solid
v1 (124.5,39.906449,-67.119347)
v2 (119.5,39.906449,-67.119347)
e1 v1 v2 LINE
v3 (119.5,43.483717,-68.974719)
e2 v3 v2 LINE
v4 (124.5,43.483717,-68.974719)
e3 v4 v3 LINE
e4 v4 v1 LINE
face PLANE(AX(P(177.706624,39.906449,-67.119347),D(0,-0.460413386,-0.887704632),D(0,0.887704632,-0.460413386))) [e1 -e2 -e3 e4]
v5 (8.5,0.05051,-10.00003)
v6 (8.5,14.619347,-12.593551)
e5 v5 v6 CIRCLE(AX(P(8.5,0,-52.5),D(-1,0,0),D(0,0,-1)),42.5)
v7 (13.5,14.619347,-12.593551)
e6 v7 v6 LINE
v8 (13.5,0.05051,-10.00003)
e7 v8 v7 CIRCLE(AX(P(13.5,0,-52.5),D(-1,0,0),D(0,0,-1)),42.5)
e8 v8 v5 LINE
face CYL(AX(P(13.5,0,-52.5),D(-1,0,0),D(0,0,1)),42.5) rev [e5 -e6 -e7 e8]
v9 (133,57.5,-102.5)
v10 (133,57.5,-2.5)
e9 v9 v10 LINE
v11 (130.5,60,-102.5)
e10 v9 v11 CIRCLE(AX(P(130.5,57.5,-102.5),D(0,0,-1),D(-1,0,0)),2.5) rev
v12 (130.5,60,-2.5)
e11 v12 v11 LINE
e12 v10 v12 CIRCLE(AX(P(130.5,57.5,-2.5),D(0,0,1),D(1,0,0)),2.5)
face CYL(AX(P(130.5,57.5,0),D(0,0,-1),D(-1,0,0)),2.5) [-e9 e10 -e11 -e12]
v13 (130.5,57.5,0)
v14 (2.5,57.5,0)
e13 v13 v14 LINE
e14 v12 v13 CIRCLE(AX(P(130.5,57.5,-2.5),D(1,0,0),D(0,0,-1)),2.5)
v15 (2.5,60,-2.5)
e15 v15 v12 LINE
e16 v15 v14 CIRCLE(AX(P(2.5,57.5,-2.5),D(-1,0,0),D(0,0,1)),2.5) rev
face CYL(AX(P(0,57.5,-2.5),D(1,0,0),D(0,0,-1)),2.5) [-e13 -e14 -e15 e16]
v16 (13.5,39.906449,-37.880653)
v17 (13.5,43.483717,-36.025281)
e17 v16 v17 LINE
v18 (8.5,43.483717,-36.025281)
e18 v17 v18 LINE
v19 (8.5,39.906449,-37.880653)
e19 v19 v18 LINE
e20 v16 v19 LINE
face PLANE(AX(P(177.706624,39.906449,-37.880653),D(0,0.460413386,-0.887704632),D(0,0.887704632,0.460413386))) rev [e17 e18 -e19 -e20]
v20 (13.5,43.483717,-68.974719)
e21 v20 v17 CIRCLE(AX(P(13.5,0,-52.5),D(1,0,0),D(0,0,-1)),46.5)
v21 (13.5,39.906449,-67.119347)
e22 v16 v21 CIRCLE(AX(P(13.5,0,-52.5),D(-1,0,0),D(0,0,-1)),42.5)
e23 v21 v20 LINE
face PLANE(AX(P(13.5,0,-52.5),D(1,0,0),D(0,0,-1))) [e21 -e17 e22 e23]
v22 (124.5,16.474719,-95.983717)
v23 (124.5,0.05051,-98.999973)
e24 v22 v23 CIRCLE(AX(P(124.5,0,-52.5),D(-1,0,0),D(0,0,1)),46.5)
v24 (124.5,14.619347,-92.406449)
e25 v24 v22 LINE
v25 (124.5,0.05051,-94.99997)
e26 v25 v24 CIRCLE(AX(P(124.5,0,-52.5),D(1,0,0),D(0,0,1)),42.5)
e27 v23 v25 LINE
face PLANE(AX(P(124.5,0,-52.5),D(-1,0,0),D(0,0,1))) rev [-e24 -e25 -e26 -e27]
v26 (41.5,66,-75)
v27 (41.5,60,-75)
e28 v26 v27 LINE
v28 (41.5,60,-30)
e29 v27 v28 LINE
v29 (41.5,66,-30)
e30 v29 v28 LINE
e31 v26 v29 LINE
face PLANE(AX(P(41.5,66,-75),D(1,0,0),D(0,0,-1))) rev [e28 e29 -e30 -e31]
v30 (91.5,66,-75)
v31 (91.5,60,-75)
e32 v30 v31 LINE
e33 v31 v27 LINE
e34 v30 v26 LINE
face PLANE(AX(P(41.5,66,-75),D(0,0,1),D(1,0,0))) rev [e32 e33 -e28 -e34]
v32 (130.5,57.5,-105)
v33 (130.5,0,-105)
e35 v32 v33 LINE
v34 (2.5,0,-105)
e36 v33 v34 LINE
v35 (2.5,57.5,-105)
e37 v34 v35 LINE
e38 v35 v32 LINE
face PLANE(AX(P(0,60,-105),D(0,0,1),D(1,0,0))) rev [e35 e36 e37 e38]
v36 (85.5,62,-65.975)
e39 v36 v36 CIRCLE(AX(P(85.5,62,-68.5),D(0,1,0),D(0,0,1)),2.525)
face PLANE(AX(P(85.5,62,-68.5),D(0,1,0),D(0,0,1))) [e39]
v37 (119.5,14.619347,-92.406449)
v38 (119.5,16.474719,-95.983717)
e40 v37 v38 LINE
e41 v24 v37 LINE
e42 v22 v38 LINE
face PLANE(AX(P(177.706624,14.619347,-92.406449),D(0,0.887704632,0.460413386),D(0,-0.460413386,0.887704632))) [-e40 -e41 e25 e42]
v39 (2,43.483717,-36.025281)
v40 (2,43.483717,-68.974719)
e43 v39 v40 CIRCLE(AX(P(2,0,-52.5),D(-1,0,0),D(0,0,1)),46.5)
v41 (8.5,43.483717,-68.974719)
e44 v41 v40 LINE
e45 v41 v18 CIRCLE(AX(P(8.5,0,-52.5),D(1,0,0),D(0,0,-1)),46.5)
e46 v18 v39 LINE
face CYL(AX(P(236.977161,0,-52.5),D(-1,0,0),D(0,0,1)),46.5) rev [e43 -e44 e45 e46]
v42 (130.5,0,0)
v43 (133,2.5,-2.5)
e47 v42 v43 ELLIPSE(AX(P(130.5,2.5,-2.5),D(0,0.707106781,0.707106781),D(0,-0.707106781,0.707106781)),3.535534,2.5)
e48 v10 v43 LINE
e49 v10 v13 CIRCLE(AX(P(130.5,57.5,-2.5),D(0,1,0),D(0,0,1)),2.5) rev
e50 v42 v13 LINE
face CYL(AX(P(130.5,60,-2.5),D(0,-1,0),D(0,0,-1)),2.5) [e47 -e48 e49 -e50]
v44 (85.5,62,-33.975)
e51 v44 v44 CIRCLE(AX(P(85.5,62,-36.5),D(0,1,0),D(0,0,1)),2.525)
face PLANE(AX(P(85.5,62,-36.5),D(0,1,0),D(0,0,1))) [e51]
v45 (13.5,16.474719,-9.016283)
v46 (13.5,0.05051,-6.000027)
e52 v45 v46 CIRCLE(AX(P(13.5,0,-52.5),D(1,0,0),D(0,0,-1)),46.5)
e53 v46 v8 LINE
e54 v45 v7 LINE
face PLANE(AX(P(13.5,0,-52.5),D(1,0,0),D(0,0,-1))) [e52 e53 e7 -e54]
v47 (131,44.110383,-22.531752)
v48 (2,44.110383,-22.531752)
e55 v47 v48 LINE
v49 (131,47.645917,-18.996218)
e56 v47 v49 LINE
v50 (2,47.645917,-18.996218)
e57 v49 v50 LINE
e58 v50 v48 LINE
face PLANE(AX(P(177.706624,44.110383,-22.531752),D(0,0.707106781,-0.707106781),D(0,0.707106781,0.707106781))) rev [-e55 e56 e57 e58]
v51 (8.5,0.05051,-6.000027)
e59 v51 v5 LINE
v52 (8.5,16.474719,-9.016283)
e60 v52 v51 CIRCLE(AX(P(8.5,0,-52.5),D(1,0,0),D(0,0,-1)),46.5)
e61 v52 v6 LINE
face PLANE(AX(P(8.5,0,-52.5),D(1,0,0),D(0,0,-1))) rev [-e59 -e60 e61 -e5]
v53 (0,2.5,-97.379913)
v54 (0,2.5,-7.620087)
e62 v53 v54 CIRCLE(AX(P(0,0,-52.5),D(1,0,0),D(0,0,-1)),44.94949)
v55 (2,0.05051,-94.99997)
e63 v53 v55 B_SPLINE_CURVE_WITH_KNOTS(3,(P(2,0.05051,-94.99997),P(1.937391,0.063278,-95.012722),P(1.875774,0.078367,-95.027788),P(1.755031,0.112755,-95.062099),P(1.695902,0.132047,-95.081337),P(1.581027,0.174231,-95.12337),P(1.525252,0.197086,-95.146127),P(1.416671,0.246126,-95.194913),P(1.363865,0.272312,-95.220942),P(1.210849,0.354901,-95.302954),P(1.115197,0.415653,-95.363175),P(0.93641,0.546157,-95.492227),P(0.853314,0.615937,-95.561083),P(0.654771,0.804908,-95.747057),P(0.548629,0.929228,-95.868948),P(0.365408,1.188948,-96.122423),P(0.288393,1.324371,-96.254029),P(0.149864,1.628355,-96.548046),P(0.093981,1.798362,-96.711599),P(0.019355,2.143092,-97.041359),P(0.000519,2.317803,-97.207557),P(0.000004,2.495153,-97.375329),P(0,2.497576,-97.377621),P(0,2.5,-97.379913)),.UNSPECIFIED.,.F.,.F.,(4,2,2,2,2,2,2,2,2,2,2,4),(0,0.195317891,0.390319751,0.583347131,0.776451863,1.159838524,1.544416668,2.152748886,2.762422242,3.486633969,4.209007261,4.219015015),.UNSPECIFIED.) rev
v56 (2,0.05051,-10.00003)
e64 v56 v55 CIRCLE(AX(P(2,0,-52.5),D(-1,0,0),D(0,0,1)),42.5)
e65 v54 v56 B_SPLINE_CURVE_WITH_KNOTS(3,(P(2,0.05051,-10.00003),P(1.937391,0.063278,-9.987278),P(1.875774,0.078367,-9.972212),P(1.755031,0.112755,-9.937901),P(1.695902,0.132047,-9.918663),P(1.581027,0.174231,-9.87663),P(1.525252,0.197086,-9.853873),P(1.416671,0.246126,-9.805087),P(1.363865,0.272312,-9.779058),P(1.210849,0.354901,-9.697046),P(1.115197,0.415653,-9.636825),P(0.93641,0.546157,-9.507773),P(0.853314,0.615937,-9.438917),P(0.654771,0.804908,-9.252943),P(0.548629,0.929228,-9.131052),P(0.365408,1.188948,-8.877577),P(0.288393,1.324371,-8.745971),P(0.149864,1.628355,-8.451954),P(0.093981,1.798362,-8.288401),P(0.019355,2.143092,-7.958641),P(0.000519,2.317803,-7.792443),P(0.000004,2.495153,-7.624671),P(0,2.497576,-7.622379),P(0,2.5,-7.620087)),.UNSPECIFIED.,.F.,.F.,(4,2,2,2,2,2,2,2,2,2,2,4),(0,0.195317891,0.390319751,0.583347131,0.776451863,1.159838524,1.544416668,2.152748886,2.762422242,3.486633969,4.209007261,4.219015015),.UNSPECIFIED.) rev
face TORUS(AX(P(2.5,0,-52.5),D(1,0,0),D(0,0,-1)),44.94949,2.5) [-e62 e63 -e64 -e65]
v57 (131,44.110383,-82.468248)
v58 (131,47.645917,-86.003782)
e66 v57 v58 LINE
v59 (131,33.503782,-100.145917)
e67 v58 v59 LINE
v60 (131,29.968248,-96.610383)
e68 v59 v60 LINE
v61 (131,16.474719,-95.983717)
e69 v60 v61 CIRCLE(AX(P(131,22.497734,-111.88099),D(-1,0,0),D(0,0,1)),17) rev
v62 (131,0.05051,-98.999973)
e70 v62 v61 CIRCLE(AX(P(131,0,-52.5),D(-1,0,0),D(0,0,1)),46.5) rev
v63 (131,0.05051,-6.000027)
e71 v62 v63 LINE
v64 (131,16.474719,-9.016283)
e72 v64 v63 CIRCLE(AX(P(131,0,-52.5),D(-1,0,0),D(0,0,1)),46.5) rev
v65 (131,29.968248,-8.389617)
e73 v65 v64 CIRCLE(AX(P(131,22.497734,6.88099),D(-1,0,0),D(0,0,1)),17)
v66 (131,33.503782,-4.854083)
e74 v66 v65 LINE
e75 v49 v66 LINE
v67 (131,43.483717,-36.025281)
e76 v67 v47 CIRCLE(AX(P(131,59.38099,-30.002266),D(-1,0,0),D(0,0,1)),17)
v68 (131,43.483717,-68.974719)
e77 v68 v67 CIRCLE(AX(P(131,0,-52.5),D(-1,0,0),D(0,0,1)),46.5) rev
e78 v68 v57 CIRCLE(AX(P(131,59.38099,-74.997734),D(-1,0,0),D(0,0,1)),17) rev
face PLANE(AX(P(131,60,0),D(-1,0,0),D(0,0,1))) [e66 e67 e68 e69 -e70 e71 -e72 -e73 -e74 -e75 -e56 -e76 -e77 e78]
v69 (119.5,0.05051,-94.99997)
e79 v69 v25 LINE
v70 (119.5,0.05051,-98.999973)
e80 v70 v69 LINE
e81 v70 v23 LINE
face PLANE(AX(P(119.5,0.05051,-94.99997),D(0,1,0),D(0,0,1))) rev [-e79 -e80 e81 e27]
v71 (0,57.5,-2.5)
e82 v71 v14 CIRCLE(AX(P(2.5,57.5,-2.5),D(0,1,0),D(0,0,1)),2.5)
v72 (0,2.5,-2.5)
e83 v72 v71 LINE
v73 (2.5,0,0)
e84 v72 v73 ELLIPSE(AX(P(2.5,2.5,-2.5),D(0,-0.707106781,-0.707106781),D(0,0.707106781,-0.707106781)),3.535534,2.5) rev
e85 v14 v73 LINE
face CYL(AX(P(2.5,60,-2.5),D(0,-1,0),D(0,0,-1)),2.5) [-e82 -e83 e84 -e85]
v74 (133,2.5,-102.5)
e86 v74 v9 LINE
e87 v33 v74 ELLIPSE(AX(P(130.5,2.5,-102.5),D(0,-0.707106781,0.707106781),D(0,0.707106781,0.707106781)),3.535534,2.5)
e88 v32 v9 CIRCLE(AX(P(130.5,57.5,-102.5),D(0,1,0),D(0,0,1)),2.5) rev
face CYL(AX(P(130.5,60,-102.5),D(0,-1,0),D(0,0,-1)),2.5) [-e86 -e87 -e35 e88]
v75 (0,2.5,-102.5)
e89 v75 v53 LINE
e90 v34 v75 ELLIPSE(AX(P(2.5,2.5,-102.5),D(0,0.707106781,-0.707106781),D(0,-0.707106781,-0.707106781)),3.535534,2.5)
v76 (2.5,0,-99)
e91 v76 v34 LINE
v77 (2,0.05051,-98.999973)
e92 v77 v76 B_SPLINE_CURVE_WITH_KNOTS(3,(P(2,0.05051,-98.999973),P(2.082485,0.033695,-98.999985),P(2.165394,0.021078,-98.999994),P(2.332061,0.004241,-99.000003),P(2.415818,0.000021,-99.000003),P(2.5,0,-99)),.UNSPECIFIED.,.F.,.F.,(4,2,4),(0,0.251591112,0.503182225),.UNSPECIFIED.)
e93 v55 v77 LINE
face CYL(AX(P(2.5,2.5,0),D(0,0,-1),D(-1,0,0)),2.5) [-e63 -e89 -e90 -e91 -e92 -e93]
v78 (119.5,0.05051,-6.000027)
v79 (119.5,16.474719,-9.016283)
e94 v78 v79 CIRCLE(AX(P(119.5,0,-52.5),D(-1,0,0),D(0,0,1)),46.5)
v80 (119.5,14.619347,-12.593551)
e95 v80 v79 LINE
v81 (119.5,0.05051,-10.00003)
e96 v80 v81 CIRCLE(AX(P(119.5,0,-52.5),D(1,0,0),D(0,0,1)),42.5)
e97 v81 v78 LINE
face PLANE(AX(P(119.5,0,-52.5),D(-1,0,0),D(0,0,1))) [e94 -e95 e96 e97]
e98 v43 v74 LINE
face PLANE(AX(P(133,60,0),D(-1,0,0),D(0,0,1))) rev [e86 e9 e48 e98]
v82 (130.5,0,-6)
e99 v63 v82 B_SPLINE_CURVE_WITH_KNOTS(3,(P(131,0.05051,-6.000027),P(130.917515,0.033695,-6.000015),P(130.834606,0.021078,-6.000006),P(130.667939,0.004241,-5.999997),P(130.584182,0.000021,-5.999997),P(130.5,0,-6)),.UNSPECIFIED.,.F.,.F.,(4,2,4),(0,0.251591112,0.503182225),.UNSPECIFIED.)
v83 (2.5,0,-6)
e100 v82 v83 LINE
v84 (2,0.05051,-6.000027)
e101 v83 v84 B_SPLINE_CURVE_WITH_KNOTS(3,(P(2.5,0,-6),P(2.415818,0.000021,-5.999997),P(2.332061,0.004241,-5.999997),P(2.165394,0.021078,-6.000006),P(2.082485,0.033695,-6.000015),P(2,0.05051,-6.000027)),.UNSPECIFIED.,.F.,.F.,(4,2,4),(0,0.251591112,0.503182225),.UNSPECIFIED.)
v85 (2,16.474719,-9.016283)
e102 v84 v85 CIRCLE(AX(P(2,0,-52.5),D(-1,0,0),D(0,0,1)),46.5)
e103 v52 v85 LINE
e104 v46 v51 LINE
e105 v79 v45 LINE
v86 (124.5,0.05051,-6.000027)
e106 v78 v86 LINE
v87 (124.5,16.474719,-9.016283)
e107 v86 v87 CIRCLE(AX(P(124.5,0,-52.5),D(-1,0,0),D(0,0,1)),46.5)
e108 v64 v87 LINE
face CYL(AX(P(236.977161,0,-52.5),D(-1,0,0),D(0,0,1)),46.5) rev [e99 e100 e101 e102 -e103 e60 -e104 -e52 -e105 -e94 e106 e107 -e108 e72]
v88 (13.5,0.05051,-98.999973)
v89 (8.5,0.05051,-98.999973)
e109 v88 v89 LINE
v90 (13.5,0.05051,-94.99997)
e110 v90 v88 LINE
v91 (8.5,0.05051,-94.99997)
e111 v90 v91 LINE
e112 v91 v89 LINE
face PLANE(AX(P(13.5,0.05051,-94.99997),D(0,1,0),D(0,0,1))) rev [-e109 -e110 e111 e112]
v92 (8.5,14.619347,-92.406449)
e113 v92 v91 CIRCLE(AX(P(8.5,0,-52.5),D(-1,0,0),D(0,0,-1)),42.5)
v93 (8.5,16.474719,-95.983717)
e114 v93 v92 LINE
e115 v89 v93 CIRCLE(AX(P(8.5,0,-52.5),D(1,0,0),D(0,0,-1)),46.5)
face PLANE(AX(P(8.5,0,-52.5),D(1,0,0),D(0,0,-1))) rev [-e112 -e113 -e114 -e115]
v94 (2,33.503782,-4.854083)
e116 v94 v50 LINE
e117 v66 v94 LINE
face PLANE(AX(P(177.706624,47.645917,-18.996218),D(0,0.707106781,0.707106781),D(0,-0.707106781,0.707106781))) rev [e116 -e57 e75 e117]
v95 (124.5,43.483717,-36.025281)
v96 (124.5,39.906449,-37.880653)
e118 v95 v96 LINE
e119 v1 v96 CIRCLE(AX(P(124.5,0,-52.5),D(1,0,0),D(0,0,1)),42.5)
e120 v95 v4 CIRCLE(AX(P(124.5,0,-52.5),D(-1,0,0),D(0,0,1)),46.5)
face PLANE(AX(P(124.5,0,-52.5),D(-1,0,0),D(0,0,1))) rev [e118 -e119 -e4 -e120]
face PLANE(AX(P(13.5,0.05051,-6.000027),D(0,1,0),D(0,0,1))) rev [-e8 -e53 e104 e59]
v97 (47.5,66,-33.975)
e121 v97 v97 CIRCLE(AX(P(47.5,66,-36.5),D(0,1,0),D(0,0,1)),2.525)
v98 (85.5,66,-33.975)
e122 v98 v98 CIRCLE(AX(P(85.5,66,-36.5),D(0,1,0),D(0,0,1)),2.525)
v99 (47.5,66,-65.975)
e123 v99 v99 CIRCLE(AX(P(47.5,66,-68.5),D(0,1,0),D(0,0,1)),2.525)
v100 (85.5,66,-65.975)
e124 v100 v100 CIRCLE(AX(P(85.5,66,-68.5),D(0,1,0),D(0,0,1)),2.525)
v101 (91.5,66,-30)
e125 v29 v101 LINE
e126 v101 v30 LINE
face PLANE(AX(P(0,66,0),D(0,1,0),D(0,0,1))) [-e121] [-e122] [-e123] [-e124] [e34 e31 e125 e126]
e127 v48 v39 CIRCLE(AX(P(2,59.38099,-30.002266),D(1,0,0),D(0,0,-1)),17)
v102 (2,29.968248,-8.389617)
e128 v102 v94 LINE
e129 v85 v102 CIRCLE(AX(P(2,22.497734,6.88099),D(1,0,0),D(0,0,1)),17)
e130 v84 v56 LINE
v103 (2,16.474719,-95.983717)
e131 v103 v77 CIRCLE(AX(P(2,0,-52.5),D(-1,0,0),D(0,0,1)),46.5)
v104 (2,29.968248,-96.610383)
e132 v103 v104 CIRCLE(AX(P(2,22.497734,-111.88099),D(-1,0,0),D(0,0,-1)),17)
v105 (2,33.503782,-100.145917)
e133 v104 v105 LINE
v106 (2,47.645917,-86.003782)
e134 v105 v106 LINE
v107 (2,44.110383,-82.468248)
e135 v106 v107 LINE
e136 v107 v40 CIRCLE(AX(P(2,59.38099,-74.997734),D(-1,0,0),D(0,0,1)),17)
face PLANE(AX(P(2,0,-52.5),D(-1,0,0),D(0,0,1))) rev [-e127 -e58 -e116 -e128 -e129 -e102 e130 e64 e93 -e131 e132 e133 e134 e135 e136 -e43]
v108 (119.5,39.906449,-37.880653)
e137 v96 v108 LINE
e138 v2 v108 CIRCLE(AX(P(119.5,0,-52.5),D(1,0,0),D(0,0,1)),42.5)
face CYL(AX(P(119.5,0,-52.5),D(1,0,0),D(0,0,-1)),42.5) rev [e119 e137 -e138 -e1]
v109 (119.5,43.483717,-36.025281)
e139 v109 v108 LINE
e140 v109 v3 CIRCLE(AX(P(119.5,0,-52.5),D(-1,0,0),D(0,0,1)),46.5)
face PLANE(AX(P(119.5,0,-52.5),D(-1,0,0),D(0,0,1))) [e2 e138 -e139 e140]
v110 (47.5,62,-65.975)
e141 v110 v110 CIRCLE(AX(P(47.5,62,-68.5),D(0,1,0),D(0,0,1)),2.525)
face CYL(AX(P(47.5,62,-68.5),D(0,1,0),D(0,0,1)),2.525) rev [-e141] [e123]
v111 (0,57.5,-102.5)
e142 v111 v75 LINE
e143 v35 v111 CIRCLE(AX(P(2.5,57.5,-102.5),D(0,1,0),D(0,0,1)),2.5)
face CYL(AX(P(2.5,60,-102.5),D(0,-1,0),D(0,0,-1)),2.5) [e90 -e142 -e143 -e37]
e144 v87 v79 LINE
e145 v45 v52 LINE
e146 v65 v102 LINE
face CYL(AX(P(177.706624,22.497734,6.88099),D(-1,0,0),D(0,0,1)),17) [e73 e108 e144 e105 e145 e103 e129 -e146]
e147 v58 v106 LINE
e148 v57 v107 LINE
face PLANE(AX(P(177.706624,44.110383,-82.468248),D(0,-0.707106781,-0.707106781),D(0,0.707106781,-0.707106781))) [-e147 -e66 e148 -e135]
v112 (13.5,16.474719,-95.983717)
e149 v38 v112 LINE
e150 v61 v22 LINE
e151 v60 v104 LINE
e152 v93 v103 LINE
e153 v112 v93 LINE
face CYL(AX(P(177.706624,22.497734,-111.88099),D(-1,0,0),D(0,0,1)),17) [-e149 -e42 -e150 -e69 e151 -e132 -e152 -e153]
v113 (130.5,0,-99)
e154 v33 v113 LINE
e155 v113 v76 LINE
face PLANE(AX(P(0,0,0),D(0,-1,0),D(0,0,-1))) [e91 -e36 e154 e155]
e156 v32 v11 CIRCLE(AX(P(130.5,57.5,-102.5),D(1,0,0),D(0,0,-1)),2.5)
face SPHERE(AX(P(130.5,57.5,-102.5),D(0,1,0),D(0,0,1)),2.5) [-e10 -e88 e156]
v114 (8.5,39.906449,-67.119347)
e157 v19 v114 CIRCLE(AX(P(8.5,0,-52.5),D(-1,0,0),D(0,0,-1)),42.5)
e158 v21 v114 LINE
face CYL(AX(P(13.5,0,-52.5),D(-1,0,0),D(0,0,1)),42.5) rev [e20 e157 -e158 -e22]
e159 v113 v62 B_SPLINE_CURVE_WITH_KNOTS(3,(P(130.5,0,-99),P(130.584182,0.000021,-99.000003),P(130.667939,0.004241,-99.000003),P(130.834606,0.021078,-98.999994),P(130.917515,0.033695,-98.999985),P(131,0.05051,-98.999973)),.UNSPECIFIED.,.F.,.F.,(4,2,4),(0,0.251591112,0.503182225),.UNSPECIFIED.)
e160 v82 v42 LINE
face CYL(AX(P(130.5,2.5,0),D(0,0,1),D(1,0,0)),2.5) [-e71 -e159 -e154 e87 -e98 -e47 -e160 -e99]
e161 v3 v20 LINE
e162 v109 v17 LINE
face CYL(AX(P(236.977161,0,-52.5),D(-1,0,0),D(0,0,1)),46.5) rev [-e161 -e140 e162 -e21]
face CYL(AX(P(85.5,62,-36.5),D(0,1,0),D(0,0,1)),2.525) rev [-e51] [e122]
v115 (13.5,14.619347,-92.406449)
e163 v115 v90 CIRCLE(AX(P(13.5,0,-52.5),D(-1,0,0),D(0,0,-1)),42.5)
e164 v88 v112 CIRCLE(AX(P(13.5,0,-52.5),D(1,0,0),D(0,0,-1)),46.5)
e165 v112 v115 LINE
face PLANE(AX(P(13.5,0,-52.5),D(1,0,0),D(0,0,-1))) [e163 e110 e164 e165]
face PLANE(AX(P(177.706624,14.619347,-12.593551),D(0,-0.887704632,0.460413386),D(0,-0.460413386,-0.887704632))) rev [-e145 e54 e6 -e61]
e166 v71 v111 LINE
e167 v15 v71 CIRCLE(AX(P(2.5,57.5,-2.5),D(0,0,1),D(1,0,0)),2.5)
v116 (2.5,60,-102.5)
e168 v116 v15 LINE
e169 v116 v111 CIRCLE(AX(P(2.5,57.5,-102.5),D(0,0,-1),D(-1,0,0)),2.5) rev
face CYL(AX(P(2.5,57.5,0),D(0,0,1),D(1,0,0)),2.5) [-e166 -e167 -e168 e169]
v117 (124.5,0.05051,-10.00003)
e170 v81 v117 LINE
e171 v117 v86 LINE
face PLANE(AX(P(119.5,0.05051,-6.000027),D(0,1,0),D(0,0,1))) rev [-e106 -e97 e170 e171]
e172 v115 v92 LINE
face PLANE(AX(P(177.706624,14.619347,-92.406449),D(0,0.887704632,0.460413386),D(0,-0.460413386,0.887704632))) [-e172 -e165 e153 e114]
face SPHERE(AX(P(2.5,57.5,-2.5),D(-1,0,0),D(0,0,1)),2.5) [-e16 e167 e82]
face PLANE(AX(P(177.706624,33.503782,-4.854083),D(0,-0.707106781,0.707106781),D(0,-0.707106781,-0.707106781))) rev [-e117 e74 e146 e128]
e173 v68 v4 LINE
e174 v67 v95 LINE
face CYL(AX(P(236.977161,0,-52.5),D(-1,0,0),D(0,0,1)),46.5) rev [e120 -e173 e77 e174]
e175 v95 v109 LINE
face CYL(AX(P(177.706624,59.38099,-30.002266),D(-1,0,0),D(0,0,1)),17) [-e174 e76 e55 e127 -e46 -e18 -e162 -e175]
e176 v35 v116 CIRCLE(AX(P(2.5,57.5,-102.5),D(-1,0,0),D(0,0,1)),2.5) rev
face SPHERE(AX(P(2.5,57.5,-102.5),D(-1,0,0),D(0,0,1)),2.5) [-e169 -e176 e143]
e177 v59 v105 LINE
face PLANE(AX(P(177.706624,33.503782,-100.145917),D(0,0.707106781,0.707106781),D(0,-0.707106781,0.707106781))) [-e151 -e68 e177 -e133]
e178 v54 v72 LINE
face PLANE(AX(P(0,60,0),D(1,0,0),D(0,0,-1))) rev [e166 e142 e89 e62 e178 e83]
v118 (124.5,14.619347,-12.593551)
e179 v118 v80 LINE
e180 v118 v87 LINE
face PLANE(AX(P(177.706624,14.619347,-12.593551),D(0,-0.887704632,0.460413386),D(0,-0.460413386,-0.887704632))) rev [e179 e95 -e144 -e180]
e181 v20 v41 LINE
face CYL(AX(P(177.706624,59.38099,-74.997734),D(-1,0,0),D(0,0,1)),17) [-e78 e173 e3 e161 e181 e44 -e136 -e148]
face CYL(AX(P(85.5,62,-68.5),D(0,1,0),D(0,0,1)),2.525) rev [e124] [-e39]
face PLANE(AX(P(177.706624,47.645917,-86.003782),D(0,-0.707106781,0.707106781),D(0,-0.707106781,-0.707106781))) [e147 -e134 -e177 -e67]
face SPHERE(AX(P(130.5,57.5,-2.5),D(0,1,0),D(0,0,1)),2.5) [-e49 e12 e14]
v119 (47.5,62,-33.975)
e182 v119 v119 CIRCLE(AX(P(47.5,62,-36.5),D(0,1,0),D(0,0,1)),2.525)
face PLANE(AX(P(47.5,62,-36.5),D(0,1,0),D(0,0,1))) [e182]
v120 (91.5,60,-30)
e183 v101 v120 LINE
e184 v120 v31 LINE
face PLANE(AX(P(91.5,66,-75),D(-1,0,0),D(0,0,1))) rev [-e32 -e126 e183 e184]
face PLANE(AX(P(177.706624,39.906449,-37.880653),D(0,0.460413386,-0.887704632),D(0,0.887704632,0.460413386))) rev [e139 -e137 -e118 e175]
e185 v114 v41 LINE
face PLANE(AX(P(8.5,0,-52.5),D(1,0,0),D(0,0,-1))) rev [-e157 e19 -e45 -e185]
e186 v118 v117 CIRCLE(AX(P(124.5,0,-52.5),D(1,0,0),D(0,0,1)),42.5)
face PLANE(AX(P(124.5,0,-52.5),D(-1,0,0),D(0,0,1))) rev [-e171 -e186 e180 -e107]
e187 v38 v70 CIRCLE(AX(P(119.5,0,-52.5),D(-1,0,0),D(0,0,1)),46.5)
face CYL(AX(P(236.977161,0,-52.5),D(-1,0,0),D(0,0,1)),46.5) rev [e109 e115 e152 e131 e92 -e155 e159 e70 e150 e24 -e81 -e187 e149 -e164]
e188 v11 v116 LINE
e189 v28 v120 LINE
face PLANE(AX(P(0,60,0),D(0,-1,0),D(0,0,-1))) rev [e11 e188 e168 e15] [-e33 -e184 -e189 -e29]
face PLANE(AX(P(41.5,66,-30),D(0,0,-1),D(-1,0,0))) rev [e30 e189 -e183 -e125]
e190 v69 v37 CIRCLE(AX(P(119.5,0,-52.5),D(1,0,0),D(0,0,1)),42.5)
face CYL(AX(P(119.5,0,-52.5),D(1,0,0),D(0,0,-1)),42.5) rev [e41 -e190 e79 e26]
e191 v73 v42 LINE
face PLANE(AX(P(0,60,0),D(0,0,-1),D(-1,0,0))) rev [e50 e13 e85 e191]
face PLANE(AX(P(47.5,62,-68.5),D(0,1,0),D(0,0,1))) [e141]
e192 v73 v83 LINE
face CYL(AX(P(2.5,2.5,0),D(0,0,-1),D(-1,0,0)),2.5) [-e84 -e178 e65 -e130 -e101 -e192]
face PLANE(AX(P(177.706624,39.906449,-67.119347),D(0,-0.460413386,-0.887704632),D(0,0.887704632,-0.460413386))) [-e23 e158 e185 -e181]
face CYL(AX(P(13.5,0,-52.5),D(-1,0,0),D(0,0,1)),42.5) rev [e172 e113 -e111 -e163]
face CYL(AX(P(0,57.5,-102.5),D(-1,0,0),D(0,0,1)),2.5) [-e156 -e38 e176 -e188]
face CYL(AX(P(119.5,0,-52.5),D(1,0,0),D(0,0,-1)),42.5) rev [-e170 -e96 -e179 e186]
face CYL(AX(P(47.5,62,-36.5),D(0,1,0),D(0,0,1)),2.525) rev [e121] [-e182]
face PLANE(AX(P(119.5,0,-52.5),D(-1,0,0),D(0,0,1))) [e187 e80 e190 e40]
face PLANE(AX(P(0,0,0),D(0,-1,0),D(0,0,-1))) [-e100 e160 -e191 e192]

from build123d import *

# Parameters (mm, degrees)
SKETCH1_W           = 133
SKETCH1_H           = 105
BOSS_EXTRUDE1_DEPTH = 60
CUT_EXTRUDE1_START  = -2
CUT_EXTRUDE1_DEPTH  = 129
SKETCH3_R           = 42.5
CUT_EXTRUDE2_DEPTH  = 10
FILLET1_R           = 2.5
SKETCH4_W           = 50
SKETCH4_H           = 45
BOSS_EXTRUDE2_DEPTH = 6
SKETCH5_R           = 2.525
CUT_EXTRUDE3_DEPTH  = 4
BOSS_EXTRUDE3_START = 6.5
BOSS_EXTRUDE3_DEPTH = 5
BOSS_EXTRUDE4_START = 11.5
BOSS_EXTRUDE4_DEPTH = 5
CUT_EXTRUDE5_REACH  = 182.394


with BuildPart() as part:
    # Sketch1 → Boss-Extrude1 (new body)
    with BuildSketch(Plane(origin=(0, 0, 0), x_dir=(1, 0, 0), z_dir=(0, 1, 0))):
        with Locations((66.5, 52.5)):
            Rectangle(SKETCH1_W, SKETCH1_H)
    extrude(amount=BOSS_EXTRUDE1_DEPTH)

    # Sketch2 → Cut-Extrude1 (cut)
    with BuildSketch(Plane.ZY.offset(CUT_EXTRUDE1_START)):
        with BuildLine():
            Line((-99, 0), (-6, 0))
            ThreePointArc((-6, 0), (-52.5, 46.5), (-99, 0))
        make_face()
    extrude(amount=-CUT_EXTRUDE1_DEPTH, mode=Mode.SUBTRACT)

    # Sketch3 → Cut-Extrude2 (cut)
    with BuildSketch(Plane.ZY):
        with Locations((-52.5, 0)):
            Circle(SKETCH3_R)
    extrude(amount=-CUT_EXTRUDE2_DEPTH, mode=Mode.SUBTRACT)

    # Fillet1
    # the kernel refuses this fillet: 2.5 mm, written as the material it takes off along each edge
    with BuildSketch(Plane(origin=(130.5, 57.5, -102.5), x_dir=(0, 1, 0), z_dir=(1, 0, 0))) as fillet1_piece_1_section:
        Polygon((0, 0), (FILLET1_R * 1.02, 0), (FILLET1_R * 1.02, -FILLET1_R * 1.02), (0, -FILLET1_R * 1.02), align=None)
    fillet1_piece_1 = extrude(amount=FILLET1_R * 1.02, mode=Mode.PRIVATE)
    fillet1_piece_1 = fillet1_piece_1 - Plane(origin=(130.5, 57.5, -102.5), x_dir=(0, -0.7071067811865475, 0.7071067811865475), z_dir=(1, 0, 0)) * Sphere(FILLET1_R, mode=Mode.PRIVATE)
    add(fillet1_piece_1, mode=Mode.SUBTRACT)
    with BuildSketch(Plane(origin=(2.5, 57.5, -102.5), x_dir=(0, 1, 0), z_dir=(-1, 0, 0))) as fillet1_piece_2_section:
        Polygon((0, 0), (FILLET1_R * 1.02, 0), (FILLET1_R * 1.02, FILLET1_R * 1.02), (0, FILLET1_R * 1.02), align=None)
    fillet1_piece_2 = extrude(amount=FILLET1_R * 1.02, mode=Mode.PRIVATE)
    fillet1_piece_2 = fillet1_piece_2 - Plane(origin=(2.5, 57.5, -102.5), x_dir=(0, -0.7071067811865475, 0.7071067811865475), z_dir=(-1, 0, 0)) * Sphere(FILLET1_R, mode=Mode.PRIVATE)
    add(fillet1_piece_2, mode=Mode.SUBTRACT)
    with BuildSketch(Plane(origin=(130.5, 57.5, -2.5), x_dir=(1, 0, 0), z_dir=(0, 0, 1))) as fillet1_piece_3_section:
        Polygon((0, 0), (FILLET1_R * 1.02, 0), (FILLET1_R * 1.02, FILLET1_R * 1.02), (0, FILLET1_R * 1.02), align=None)
    fillet1_piece_3 = extrude(amount=FILLET1_R * 1.02, mode=Mode.PRIVATE)
    fillet1_piece_3 = fillet1_piece_3 - Plane(origin=(130.5, 57.5, -2.5), x_dir=(-0.7071067811865475, -0.7071067811865475, 0), z_dir=(0, 0, 1)) * Sphere(FILLET1_R, mode=Mode.PRIVATE)
    add(fillet1_piece_3, mode=Mode.SUBTRACT)
    with BuildSketch(Plane(origin=(2.5, 57.5, -2.5), x_dir=(-1, 0, 0), z_dir=(0, 0, 1))) as fillet1_piece_4_section:
        Polygon((0, 0), (FILLET1_R * 1.02, 0), (FILLET1_R * 1.02, -FILLET1_R * 1.02), (0, -FILLET1_R * 1.02), align=None)
    fillet1_piece_4 = extrude(amount=FILLET1_R * 1.02, mode=Mode.PRIVATE)
    fillet1_piece_4 = fillet1_piece_4 - Plane(origin=(2.5, 57.5, -2.5), x_dir=(0.7071067811865475, -0.7071067811865475, 0), z_dir=(0, 0, 1)) * Sphere(FILLET1_R, mode=Mode.PRIVATE)
    add(fillet1_piece_4, mode=Mode.SUBTRACT)
    with BuildSketch(Plane(origin=(130.5, 60, -105), x_dir=(0, 0, 1), z_dir=(-1, 0, 0))) as fillet1_piece_5:
        with BuildLine():
            CenterArc((FILLET1_R, -FILLET1_R), FILLET1_R, 90, 90)
            Line((0, -FILLET1_R), (0, 0))
            Line((0, 0), (FILLET1_R, 0))
        make_face()
    extrude(amount=128, mode=Mode.SUBTRACT)
    with BuildSketch(Plane(origin=(133, 60, -2.5), x_dir=(0, -1, 0), z_dir=(0, 0, -1)), Plane(origin=(0, 60, -102.5), x_dir=(0, -1, 0), z_dir=(0, 0, 1))) as fillet1_piece_6:
        with BuildLine():
            CenterArc((FILLET1_R, FILLET1_R), FILLET1_R, 180, 90)
            Line((0, FILLET1_R), (0, 0))
            Line((0, 0), (FILLET1_R, 0))
        make_face()
    extrude(amount=100, mode=Mode.SUBTRACT)
    with BuildSketch(Plane(origin=(2.5, 60, 0), x_dir=(0, -1, 0), z_dir=(1, 0, 0))) as fillet1_piece_7:
        with BuildLine():
            CenterArc((FILLET1_R, FILLET1_R), FILLET1_R, 180, 90)
            Line((0, FILLET1_R), (0, 0))
            Line((0, 0), (FILLET1_R, 0))
        make_face()
    extrude(amount=128, mode=Mode.SUBTRACT)
    with BuildSketch(Plane(origin=(133, -6.25, 0), x_dir=(-1, 0, 0), z_dir=(0, 1, 0)), Plane(origin=(133, -6.25, -105), x_dir=(0, 0, 1), z_dir=(0, 1, 0))) as fillet1_piece_8:
        with BuildLine():
            CenterArc((FILLET1_R, -FILLET1_R), FILLET1_R, 90, 90)
            Line((0, -FILLET1_R), (0, 0))
            Line((0, 0), (FILLET1_R, 0))
        make_face()
    extrude(amount=63.75, mode=Mode.SUBTRACT)
    with BuildSketch(Plane(origin=(133, 0, 6.25), x_dir=(0, 1, 0), z_dir=(0, 0, -1))) as fillet1_piece_9:
        with BuildLine():
            CenterArc((FILLET1_R, -FILLET1_R), FILLET1_R, 90, 90)
            Line((0, -FILLET1_R), (0, 0))
            Line((0, 0), (FILLET1_R, 0))
        make_face()
    extrude(amount=117.5, mode=Mode.SUBTRACT)
    with BuildSketch(Plane(origin=(0, -6.25, -105), x_dir=(0, 0, 1), z_dir=(0, 1, 0)), Plane(origin=(0, -6.25, 0), x_dir=(1, 0, 0), z_dir=(0, 1, 0))) as fillet1_piece_10:
        with BuildLine():
            CenterArc((FILLET1_R, FILLET1_R), FILLET1_R, 180, 90)
            Line((0, FILLET1_R), (0, 0))
            Line((0, 0), (FILLET1_R, 0))
        make_face()
    extrude(amount=63.75, mode=Mode.SUBTRACT)
    with BuildSketch(Plane(origin=(0, 0, -16.25), x_dir=(0, 1, 0), z_dir=(0, 0, 1)), Plane(origin=(0, 0, -111.25), x_dir=(0, 1, 0), z_dir=(0, 0, 1))) as fillet1_piece_11:
        with BuildLine():
            CenterArc((FILLET1_R, -FILLET1_R), FILLET1_R, 90, 90)
            Line((0, -FILLET1_R), (0, 0))
            Line((0, 0), (FILLET1_R, 0))
        make_face()
    extrude(amount=22.5, mode=Mode.SUBTRACT)
    with BuildSketch(Plane(origin=(0, 0, -52.5), x_dir=(0, -0.14381889116089097, 0.9896040251258337), z_dir=(0, -0.9896040251258337, -0.14381889116089097))) as fillet1_piece_12:
        with BuildLine():
            CenterArc((44.949489743, -2.5), FILLET1_R, 90, 78.463040967)
            Line((42.5, -2), (42.5, 0))
            Line((42.5, 0), (44.949489743, 0))
        make_face()
    revolve(axis=Axis((0, 0, -52.5), (-1, 0, 0)), revolution_arc=196.537779553, mode=Mode.SUBTRACT)

    # Sketch4 → Boss-Extrude2 (add)
    with BuildSketch(Plane(origin=(0, 60, 0), x_dir=(1, 0, 0), z_dir=(0, 1, 0))):
        with Locations((66.5, 52.5)):
            Rectangle(SKETCH4_W, SKETCH4_H)
    extrude(amount=BOSS_EXTRUDE2_DEPTH)

    # Sketch5 → Cut-Extrude3 (cut)
    with BuildSketch(Plane(origin=(0, 66, 0), x_dir=(1, 0, 0), z_dir=(0, 1, 0))):
        with Locations(Location((47.5, 68.5, 0), (0, 0, 270))):
            Circle(SKETCH5_R)
        with Locations(Location((85.5, 68.5, 0), (0, 0, 270))):
            Circle(SKETCH5_R)
        with Locations(Location((85.5, 36.5, 0), (0, 0, 270))):
            Circle(SKETCH5_R)
        with Locations(Location((47.5, 36.5, 0), (0, 0, 270))):
            Circle(SKETCH5_R)
    extrude(amount=-CUT_EXTRUDE3_DEPTH, mode=Mode.SUBTRACT)

    # Sketch6 → Boss-Extrude3 (add)
    with BuildSketch(Plane(origin=(2, 0, 0), x_dir=(0, 0, -1), z_dir=(1, 0, 0)).offset(BOSS_EXTRUDE3_START)):
        with BuildLine():
            Line((94.999969985, 0.050510257), (98.999972567, 0.050510257))
            ThreePointArc((98.999972567, 0.050510257), (52.5, 46.5), (6.000027433, 0.050510257))
            Line((6.000027433, 0.050510257), (10.000030015, 0.050510257))
            ThreePointArc((10.000030015, 0.050510257), (52.5, 42.5), (94.999969985, 0.050510257))
        make_face()
    extrude(amount=BOSS_EXTRUDE3_DEPTH)

    # Sketch7 → Boss-Extrude4 (add)
    with BuildSketch(Plane.ZY.offset(-131).offset(BOSS_EXTRUDE4_START)):
        with BuildLine():
            Line((-6.000027433, 0.050510257), (-10.000030015, 0.050510257))
            ThreePointArc((-10.000030015, 0.050510257), (-52.5, 42.5), (-94.999969985, 0.050510257))
            Line((-94.999969985, 0.050510257), (-98.999972567, 0.050510257))
            ThreePointArc((-98.999972567, 0.050510257), (-52.5, 46.5), (-6.000027433, 0.050510257))
        make_face()
    extrude(amount=-BOSS_EXTRUDE4_DEPTH)

    # Cut-Extrude5: up to this face of the body (flat: up to its plane)
    cut_extrude5_end = Plane(part.part.faces().sort_by_distance((131, 19.762510478, -52.5))[0])
    # Sketch14 → Cut-Extrude5 (cut, up to the picked face)
    with BuildSketch(Plane.ZY.offset(-2), mode=Mode.PRIVATE) as cut_extrude5_sk1:
        with BuildLine():
            Line((-22.531752229, 44.110383395), (-18.996218323, 47.645917301))
            Line((-18.996218323, 47.645917301), (-4.854082699, 33.503781677))
            Line((-4.854082699, 33.503781677), (-8.389616605, 29.968247771))
            ThreePointArc((-8.389616605, 29.968247771), (-10.100706376, 23.286397782), (-9.016282965, 16.474718596))
            Line((-9.016282965, 16.474718596), (-12.593550728, 14.619346994))
            ThreePointArc((-12.593550728, 14.619346994), (-22.4479618, 30.0520382), (-37.880653006, 39.906449272))
            Line((-37.880653006, 39.906449272), (-36.025281404, 43.483717035))
            ThreePointArc((-36.025281404, 43.483717035), (-29.213602218, 42.399293624), (-22.531752229, 44.110383395))
        make_face()
    cut_extrude5_tool1 = split(extrude(cut_extrude5_sk1.sketch, amount=-CUT_EXTRUDE5_REACH, mode=Mode.PRIVATE), bisect_by=cut_extrude5_end, keep=Keep.BOTH, mode=Mode.PRIVATE)
    cut_extrude5 = cut_extrude5_tool1.solids().sort_by(Axis((2, 34.053009, -18.446991), (1, 0, 0)))[0]
    add(cut_extrude5, mode=Mode.SUBTRACT)

    # Mirror3: Cut-Extrude5 across plane
    add(cut_extrude5.mirror(Plane(origin=(0, 0, -52.5), x_dir=(1, 0, 0), z_dir=(0, 0, -1))), mode=Mode.SUBTRACT)


solid = part.part
